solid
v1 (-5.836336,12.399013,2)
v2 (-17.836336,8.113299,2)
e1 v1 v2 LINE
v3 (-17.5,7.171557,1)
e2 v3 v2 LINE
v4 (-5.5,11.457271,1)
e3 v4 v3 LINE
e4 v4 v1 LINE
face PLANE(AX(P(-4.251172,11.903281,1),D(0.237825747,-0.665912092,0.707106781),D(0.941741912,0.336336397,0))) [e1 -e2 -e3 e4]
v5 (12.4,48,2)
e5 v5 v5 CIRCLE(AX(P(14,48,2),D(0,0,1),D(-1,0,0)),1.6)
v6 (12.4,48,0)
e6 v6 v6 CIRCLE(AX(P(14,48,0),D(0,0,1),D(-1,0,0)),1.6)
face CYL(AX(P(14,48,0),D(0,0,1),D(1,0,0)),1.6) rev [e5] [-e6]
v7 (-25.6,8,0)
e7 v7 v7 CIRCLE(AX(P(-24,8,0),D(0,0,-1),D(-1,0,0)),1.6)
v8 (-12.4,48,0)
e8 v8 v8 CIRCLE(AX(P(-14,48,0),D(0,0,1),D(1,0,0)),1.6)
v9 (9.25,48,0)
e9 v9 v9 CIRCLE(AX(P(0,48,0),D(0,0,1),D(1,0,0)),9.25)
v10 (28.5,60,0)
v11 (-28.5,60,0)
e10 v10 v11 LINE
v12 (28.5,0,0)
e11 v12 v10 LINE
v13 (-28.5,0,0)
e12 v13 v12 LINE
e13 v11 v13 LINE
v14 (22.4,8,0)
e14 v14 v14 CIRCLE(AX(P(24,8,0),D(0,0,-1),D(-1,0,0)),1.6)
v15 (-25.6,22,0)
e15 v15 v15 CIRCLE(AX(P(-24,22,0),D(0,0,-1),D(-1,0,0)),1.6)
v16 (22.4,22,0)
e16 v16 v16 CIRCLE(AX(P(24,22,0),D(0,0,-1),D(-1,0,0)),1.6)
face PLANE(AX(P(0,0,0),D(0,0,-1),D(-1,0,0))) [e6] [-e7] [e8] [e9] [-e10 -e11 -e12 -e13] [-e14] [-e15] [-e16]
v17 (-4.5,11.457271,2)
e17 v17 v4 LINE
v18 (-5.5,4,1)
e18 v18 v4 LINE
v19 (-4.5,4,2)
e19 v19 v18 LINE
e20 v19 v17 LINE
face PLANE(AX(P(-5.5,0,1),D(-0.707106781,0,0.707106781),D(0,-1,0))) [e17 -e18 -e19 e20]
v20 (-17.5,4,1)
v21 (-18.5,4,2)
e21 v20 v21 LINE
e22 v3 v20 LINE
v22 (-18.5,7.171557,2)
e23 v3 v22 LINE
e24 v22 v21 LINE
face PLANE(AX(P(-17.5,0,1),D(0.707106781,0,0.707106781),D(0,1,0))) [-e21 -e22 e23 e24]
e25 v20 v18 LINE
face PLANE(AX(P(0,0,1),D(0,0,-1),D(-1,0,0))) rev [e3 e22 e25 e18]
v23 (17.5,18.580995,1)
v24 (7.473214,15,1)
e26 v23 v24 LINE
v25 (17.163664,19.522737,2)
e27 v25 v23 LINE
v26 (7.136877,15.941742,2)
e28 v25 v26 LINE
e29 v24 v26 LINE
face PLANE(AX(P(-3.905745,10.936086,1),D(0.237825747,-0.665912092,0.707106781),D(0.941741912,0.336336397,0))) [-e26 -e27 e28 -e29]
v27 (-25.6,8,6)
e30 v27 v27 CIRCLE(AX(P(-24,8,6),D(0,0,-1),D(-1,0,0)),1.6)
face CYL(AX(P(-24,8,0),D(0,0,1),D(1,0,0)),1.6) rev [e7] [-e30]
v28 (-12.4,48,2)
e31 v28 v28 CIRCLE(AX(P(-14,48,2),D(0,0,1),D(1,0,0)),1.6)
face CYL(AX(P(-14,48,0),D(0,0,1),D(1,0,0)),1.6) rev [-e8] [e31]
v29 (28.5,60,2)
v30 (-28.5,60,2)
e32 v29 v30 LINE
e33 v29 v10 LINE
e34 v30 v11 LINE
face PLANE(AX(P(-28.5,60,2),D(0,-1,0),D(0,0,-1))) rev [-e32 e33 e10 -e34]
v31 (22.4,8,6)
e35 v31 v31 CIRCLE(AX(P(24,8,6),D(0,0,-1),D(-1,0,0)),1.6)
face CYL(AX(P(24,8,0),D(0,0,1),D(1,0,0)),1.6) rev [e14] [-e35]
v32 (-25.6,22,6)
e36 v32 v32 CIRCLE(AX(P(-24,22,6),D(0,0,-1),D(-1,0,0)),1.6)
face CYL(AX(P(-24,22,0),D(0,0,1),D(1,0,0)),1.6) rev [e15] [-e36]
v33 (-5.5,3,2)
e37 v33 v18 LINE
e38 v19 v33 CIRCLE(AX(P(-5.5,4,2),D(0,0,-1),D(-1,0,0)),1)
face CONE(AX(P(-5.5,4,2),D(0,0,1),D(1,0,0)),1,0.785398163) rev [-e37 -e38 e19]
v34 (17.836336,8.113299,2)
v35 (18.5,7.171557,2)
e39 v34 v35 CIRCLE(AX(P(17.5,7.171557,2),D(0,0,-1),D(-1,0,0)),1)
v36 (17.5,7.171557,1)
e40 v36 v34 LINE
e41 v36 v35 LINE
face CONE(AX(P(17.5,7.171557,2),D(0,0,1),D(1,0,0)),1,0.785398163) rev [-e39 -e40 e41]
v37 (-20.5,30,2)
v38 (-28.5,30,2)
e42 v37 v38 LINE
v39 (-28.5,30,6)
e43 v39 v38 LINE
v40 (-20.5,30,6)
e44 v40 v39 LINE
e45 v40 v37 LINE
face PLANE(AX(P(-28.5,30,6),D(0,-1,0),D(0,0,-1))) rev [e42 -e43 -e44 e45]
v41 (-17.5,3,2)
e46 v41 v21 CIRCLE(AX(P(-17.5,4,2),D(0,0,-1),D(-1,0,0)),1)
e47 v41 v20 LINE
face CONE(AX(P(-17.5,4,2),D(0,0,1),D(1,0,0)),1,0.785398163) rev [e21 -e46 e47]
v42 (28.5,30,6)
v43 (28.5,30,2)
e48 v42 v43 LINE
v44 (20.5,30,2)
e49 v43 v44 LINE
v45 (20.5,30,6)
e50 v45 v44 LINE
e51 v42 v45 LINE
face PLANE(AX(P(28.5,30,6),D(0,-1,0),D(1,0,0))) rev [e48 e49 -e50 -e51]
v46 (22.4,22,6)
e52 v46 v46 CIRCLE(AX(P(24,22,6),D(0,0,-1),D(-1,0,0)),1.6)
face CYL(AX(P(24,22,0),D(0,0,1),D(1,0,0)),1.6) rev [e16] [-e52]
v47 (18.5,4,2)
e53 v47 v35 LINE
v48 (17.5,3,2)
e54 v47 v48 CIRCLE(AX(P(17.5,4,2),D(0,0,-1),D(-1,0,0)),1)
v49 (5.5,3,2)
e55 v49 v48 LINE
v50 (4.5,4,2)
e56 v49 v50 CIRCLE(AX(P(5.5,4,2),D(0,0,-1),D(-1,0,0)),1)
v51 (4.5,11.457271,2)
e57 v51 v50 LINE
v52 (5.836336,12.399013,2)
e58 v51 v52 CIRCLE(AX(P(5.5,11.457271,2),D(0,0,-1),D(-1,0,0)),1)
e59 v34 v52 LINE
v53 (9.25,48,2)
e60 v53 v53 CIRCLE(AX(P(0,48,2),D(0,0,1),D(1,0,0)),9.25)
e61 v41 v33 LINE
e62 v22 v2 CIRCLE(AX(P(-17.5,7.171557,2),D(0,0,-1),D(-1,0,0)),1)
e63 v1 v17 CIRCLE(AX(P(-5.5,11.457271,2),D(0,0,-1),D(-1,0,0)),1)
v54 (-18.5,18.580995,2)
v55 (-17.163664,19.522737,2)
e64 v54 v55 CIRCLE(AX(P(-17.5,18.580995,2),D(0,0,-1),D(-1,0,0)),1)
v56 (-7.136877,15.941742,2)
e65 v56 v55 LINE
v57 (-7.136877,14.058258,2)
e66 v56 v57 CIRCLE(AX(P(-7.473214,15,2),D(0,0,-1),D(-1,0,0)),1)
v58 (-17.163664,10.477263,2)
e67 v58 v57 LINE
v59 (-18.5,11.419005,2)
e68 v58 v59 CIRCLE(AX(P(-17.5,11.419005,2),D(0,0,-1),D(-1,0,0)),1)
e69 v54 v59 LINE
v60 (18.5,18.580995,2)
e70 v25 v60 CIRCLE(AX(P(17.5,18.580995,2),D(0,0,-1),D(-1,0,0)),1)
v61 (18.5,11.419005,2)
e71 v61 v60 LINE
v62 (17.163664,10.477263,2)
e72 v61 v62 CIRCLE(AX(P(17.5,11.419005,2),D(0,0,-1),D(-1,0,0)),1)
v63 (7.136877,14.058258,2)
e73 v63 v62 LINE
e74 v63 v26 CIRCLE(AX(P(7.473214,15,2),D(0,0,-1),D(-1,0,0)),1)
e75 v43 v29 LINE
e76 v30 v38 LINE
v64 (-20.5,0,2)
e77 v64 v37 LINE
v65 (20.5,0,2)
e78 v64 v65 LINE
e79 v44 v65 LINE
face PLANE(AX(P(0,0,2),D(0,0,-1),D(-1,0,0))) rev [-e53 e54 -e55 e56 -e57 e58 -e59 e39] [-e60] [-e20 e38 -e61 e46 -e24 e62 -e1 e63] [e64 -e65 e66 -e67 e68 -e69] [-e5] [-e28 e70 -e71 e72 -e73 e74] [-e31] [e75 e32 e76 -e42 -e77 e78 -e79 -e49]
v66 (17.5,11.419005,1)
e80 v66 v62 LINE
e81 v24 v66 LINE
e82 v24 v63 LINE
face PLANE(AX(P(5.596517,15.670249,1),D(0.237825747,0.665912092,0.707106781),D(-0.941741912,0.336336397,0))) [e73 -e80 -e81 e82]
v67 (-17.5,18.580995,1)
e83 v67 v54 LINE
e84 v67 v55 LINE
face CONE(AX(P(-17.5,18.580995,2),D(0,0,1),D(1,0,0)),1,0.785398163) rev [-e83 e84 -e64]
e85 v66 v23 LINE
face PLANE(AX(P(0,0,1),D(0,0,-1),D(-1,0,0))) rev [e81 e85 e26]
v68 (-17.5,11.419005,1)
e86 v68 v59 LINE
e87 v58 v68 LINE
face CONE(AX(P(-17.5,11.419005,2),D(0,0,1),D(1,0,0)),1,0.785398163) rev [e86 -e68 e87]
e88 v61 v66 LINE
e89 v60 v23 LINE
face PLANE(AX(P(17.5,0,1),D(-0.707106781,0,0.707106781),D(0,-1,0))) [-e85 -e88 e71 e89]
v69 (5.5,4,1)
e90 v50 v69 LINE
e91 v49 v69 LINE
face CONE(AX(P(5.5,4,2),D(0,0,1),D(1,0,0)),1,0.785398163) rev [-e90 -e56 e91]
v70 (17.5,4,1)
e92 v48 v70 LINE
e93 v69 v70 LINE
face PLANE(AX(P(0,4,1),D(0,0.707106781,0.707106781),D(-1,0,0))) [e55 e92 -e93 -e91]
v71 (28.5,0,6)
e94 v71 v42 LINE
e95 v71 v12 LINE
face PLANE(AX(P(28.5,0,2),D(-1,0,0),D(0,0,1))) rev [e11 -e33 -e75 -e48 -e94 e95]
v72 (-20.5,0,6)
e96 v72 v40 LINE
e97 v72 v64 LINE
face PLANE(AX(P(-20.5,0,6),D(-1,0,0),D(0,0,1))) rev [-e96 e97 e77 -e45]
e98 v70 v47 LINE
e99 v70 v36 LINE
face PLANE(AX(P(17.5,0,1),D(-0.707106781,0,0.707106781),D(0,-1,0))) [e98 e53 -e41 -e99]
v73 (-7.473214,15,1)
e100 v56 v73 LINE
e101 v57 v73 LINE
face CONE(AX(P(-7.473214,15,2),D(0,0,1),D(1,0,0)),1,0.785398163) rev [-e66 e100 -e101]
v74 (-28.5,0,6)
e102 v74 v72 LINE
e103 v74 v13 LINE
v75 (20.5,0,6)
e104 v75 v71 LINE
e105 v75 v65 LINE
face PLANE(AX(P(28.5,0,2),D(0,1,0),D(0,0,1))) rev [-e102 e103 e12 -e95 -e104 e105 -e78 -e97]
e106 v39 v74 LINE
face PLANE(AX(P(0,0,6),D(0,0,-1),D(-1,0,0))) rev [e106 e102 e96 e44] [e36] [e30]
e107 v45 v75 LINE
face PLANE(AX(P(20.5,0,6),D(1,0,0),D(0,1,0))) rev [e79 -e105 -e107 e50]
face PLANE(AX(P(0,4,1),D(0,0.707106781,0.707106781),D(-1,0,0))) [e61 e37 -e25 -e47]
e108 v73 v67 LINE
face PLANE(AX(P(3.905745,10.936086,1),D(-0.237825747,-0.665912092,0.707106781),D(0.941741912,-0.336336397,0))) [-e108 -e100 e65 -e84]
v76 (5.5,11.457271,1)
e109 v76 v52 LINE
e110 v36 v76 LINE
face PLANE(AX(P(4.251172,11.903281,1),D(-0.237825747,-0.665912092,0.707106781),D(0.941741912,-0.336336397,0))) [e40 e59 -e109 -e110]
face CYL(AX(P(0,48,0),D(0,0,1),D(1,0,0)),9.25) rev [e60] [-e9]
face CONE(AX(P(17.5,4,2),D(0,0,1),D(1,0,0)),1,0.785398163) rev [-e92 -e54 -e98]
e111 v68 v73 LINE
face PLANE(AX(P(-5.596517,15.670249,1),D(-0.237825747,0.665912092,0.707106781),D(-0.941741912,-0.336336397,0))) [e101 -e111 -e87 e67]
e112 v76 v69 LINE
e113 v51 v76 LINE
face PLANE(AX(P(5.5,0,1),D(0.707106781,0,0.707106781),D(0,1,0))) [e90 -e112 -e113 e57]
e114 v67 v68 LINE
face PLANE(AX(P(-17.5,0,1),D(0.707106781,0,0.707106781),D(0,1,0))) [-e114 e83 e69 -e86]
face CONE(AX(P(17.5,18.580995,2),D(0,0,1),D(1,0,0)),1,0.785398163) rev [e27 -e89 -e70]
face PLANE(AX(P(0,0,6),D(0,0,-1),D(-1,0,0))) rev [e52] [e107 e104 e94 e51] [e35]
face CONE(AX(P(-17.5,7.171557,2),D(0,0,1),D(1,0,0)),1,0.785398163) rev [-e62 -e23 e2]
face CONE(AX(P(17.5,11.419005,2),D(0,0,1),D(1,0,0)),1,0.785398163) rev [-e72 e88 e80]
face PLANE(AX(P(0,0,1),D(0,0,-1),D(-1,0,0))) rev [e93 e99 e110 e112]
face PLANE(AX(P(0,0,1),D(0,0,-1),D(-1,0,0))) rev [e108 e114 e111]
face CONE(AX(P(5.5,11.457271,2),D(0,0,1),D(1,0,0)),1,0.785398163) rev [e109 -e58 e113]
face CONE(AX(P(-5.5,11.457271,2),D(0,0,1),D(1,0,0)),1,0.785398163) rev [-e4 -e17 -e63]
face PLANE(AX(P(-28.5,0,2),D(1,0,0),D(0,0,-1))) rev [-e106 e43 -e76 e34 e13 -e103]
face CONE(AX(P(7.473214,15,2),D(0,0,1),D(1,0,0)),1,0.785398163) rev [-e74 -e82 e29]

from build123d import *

# Parameters (mm, degrees)
SKIZZE1_W                       = 57
SKIZZE1_H                       = 60
GRUNDPLATTE_DEPTH               = 2
SKIZZE2_R                       = 9.25
SKIZZE2_R_2                     = 1.6
AUSSCHNITT_ROLLE_DEPTH          = 67.454871906
SKIZZE4_W                       = 8
SKIZZE4_H                       = 30
AUFSATZ_GETRIEBE_DEPTH          = 4
BOHRUNGEN_START                 = 4
SKIZZE3_R                       = 1.6
BOHRUNGEN_GETRIEBE_DEPTH        = 71.54509749
SCHNITT_LINEAR_AUSTRAGEN3_DEPTH = 1
VERRUNDUNG1_R                   = 1
FASE1_SIZE                      = 1


with BuildPart() as part:
    # Skizze1 → Grundplatte (new body)
    with BuildSketch(Plane.XY):
        with Locations((0, 30)):
            Rectangle(SKIZZE1_W, SKIZZE1_H)
    extrude(amount=GRUNDPLATTE_DEPTH)

    # Skizze2 → Ausschnitt_Rolle (cut, through all)
    with BuildSketch(Plane.XY.offset(2)):
        with Locations((0, 48)):
            Circle(SKIZZE2_R)
        with Locations((-14, 48)):
            Circle(SKIZZE2_R_2)
        with Locations(Location((14, 48, 0), (0, 0, 180))):
            Circle(SKIZZE2_R_2)
    extrude(amount=-AUSSCHNITT_ROLLE_DEPTH, mode=Mode.SUBTRACT)

    # Skizze4 → Aufsatz Getriebe (add)
    with BuildSketch(Plane.XY.offset(2)):
        with Locations((24.5, 15)):
            Rectangle(SKIZZE4_W, SKIZZE4_H)
        with Locations((-24.5, 15)):
            Rectangle(SKIZZE4_W, SKIZZE4_H)
    extrude(amount=AUFSATZ_GETRIEBE_DEPTH)

    # Skizze3 → Bohrungen Getriebe (cut, through all)
    with BuildSketch(Plane.XY.offset(2).offset(BOHRUNGEN_START)):
        with Locations(Location((-24, 22, 0), (0, 0, 180))):
            Circle(SKIZZE3_R)
        with Locations(Location((-24, 8, 0), (0, 0, 180))):
            Circle(SKIZZE3_R)
        with Locations(Location((24, 8, 0), (0, 0, 180))):
            Circle(SKIZZE3_R)
        with Locations(Location((24, 22, 0), (0, 0, 180))):
            Circle(SKIZZE3_R)
    extrude(amount=-BOHRUNGEN_GETRIEBE_DEPTH, mode=Mode.SUBTRACT)

    # Skizze5 → Schnitt-Linear austragen3 (cut)
    with BuildSketch(Plane.XY.offset(2)):
        Polygon((-18.5, 20), (-18.5, 10), (-4.5, 15), align=None)
        Polygon((-18.5, 7.876275893), (-18.5, 3), (-4.5, 3), (-4.5, 12.876275893), align=None)
        Polygon((4.5, 12.876275893), (18.5, 7.876275893), (18.5, 3), (4.5, 3), align=None)
        Polygon((4.5, 15), (18.5, 20), (18.5, 10), align=None)
    extrude(amount=-SCHNITT_LINEAR_AUSTRAGEN3_DEPTH, mode=Mode.SUBTRACT)

    # Verrundung1
    verrundung1_edges = [part.edges().sort_by_distance(p)[0] for p in [
        (-18.5, 3, 1.5),
        (-4.5, 3, 1.5),
        (-4.5, 12.876275893, 1.5),
        (-18.5, 7.876275893, 1.5),
        (18.5, 20, 1.5),
        (4.5, 15, 1.5),
        (18.5, 10, 1.5),
        (18.5, 3, 1.5),
        (18.5, 7.876275893, 1.5),
        (4.5, 12.876275893, 1.5),
        (4.5, 3, 1.5),
        (-18.5, 10, 1.5),
        (-4.5, 15, 1.5),
        (-18.5, 20, 1.5),
    ]]
    fillet(verrundung1_edges, radius=VERRUNDUNG1_R)

    # Fase1
    fase1_edges = [part.edges().sort_by_distance(p)[0] for p in [
        (4.923951563, 12.274686543, 1),
        (11.836336397, 10.256155751, 1),
        (18.31741556, 7.747605134, 1),
        (18.5, 5.585778349, 1),
        (18.207106781, 3.292893219, 1),
        (11.5, 3, 1),
        (4.792893219, 3.292893219, 1),
        (4.5, 7.728635491, 1),
        (18.076048437, 10.60158935, 1),
        (12.150270478, 12.267760544, 1),
        (6.473213749, 15, 1),
        (12.150270478, 17.732239456, 1),
        (18.076048437, 19.39841065, 1),
        (18.5, 15, 1),
        (-18.207106781, 3.292893219, 1),
        (-18.5, 5.585778349, 1),
        (-18.31741556, 7.747605134, 1),
        (-11.836336397, 10.256155751, 1),
        (-4.923951563, 12.274686543, 1),
        (-4.5, 7.728635491, 1),
        (-4.792893219, 3.292893219, 1),
        (-11.5, 3, 1),
        (-18.076048437, 10.60158935, 1),
        (-18.5, 15, 1),
        (-18.076048437, 19.39841065, 1),
        (-12.150270478, 17.732239456, 1),
        (-6.473213749, 15, 1),
        (-12.150270478, 12.267760544, 1),
    ]]
    chamfer(fase1_edges, length=FASE1_SIZE - 0.0001)  # a hair under: the kernel refuses the full size


solid = part.part
